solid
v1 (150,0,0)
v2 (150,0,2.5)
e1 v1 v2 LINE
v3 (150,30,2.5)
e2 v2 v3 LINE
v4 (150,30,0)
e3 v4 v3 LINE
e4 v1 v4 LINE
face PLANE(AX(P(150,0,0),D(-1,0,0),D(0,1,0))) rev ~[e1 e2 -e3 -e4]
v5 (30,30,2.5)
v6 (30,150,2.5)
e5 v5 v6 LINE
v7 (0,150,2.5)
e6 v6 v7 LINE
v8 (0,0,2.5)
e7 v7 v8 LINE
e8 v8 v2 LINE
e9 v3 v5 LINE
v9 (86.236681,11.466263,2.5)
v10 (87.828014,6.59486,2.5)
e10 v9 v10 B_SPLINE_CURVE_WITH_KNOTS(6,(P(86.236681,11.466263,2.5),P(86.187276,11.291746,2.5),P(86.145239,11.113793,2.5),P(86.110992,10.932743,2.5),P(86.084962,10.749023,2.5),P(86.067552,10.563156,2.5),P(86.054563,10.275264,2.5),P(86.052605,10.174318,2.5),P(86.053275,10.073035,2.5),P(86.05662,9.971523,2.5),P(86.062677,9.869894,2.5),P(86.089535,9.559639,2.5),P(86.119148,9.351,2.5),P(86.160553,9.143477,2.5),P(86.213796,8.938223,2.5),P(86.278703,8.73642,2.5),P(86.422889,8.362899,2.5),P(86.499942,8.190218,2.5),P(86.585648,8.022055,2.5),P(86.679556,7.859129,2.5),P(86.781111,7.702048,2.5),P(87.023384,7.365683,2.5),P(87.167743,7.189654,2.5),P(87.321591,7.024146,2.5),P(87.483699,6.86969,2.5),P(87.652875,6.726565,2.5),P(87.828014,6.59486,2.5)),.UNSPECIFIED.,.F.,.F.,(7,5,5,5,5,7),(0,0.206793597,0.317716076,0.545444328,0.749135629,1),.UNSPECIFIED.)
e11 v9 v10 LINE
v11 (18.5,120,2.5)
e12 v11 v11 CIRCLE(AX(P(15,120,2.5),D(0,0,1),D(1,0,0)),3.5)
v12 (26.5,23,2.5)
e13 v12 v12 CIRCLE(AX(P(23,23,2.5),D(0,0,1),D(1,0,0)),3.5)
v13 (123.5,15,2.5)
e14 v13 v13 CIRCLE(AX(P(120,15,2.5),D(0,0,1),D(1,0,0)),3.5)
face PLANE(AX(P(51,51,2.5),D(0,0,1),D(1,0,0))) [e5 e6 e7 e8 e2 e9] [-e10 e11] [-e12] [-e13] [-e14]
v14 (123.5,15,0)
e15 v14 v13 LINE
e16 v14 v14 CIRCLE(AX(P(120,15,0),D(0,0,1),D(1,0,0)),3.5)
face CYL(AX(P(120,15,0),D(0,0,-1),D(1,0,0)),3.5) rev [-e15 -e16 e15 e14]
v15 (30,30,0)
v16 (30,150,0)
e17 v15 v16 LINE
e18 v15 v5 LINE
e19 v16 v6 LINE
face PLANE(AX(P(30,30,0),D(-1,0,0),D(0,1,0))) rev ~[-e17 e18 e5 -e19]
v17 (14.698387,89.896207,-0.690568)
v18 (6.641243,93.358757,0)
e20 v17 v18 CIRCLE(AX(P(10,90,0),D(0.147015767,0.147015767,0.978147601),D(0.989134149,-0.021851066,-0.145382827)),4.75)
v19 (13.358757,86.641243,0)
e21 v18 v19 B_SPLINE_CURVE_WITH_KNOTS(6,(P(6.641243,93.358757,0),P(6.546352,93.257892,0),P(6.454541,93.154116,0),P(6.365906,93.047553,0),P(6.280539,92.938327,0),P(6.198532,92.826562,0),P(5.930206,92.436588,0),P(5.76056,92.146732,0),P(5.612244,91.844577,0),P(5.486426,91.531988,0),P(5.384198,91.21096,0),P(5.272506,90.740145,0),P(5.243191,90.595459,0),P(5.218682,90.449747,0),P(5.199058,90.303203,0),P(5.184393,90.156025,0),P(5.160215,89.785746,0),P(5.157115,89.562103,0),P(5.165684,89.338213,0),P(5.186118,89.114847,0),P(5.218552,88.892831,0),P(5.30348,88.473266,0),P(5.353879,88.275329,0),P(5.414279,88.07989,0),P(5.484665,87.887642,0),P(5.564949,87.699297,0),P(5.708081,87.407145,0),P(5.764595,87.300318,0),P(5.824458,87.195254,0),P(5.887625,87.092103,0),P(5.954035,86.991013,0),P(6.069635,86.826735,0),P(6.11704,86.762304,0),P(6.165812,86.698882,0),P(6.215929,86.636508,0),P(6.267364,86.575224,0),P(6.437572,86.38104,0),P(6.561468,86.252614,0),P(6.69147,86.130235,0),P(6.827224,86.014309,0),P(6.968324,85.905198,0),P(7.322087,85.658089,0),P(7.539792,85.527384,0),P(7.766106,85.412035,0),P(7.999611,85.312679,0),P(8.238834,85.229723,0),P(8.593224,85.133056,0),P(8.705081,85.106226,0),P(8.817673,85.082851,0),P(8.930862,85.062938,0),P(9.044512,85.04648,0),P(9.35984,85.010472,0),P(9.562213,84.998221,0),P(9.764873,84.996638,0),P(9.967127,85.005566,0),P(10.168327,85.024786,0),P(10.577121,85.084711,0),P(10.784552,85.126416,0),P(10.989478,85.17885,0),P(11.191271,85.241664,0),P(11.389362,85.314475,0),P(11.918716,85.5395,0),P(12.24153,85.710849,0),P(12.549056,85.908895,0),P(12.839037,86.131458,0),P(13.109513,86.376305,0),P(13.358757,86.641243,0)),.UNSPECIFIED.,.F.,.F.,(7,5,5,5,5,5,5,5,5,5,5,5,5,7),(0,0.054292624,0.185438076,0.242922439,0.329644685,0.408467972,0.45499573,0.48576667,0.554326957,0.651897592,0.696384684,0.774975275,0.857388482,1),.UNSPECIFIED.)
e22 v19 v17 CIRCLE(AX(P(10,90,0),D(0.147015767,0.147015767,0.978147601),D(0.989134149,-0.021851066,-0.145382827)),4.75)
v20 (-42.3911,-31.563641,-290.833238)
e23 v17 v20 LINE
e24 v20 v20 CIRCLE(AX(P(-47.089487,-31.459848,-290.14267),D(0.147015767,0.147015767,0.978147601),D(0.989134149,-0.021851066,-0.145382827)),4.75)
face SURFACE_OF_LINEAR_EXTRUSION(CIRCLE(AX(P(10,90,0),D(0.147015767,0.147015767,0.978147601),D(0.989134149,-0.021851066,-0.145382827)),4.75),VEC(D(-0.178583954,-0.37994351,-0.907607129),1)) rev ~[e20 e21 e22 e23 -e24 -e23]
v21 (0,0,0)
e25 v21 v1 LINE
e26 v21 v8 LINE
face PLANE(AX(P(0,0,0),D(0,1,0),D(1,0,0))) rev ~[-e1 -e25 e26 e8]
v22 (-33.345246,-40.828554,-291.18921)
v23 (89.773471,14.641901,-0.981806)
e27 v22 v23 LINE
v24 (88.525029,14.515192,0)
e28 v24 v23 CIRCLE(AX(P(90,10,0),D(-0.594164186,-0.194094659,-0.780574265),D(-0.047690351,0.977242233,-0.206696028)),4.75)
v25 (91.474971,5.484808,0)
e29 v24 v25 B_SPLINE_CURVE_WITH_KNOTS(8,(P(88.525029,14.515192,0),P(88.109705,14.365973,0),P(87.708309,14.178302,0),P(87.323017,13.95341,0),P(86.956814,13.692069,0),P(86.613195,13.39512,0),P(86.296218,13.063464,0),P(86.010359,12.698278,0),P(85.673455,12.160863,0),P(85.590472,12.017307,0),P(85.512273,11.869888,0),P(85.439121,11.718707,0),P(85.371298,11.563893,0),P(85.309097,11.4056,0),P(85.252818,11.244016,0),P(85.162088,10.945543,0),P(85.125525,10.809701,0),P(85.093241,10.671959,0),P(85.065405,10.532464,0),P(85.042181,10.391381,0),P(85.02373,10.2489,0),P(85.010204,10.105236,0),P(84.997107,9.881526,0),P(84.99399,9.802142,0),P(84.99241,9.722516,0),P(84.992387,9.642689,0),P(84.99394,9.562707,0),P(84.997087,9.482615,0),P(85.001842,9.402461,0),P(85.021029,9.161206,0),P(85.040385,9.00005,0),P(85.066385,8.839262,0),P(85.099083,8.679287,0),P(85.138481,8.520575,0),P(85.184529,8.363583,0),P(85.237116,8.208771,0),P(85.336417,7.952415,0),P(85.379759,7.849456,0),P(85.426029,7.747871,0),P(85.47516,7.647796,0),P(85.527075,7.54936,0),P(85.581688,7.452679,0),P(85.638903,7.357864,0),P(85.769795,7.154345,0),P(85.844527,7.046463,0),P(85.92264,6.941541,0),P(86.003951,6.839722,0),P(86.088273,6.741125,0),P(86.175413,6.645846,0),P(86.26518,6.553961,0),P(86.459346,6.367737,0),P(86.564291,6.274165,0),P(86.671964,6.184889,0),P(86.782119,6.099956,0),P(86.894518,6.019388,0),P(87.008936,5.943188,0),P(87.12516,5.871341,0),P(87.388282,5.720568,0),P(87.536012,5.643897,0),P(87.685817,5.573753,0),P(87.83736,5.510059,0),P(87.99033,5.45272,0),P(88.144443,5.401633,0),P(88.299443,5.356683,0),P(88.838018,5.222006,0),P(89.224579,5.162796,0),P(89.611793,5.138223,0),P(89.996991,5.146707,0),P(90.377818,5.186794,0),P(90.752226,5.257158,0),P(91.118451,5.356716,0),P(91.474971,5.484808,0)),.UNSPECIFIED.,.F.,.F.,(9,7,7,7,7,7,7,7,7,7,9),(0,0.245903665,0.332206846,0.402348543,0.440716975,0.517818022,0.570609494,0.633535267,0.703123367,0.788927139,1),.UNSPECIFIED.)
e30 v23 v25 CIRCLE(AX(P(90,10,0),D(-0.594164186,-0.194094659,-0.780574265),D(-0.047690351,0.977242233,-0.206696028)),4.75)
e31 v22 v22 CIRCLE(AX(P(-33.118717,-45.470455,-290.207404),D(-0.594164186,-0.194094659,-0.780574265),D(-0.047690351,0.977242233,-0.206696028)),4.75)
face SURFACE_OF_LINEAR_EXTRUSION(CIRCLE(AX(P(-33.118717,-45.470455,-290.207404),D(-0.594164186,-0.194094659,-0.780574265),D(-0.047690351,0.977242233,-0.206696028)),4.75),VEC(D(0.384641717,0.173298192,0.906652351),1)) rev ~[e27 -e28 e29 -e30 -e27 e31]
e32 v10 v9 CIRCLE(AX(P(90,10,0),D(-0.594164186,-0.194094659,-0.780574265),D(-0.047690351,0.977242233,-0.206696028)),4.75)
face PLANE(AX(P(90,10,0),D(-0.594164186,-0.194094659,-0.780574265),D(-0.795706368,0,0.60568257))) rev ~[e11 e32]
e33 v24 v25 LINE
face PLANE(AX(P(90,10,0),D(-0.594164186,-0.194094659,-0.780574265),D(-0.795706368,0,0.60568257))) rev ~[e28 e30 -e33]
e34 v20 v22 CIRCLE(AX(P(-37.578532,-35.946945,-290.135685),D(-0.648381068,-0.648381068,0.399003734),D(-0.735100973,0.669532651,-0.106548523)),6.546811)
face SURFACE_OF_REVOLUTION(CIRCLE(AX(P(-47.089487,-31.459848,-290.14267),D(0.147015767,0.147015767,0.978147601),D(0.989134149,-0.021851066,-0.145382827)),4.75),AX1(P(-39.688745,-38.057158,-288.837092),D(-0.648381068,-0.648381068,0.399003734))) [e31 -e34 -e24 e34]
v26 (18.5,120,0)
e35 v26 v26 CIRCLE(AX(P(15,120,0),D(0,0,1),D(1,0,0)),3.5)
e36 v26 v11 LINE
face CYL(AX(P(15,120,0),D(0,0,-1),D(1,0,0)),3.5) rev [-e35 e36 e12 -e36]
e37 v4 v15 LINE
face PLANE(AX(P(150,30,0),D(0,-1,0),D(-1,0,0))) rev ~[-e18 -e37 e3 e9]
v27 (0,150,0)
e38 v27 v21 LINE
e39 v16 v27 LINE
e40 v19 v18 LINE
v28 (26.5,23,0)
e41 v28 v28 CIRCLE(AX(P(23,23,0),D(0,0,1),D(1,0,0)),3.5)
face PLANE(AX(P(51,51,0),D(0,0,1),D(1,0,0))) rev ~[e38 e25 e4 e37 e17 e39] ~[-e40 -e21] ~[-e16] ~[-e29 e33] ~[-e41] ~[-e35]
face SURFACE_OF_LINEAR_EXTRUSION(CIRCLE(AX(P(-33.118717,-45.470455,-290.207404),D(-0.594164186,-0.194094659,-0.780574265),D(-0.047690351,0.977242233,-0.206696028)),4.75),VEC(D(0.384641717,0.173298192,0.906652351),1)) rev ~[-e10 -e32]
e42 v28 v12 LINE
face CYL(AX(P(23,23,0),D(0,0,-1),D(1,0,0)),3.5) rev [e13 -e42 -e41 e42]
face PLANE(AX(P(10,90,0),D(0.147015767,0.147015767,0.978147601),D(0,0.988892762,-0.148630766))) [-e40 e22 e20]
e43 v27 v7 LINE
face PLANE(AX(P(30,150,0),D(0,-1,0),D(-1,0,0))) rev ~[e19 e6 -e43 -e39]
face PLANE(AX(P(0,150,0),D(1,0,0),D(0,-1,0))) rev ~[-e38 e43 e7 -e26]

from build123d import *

# Parameters (mm, degrees)
F0_R     = 4.75
F0_R_2   = 3.5
F1_DEPTH = 2.5
F9_R     = 4.75


with BuildPart() as f1:
    # F0 (on Top) → F1 (new body)
    with BuildSketch(Plane.XY):
        Polygon((0, 150), (0, 0), (150, 0), (150, 10), (150, 30), (30, 30), (30, 150), (10, 150), align=None)
        with Locations((10, 10)):
            Circle(F0_R, mode=Mode.SUBTRACT)
        with Locations((23, 23)):
            Circle(F0_R_2, mode=Mode.SUBTRACT)
        with Locations((90, 10)):
            Circle(F0_R, mode=Mode.SUBTRACT)
        with Locations((120, 15)):
            Circle(F0_R_2, mode=Mode.SUBTRACT)
        with Locations((10, 90)):
            Circle(F0_R, mode=Mode.SUBTRACT)
        with Locations((15, 120)):
            Circle(F0_R_2, mode=Mode.SUBTRACT)
        with Locations((10, 10)):
            Circle(F0_R)
        with Locations((90, 10)):
            Circle(F0_R)
        with Locations((10, 90)):
            Circle(F0_R)
    extrude(amount=F1_DEPTH)

    # F10: sweep along a path in F7
    with BuildLine(Plane(origin=(42.039800995, 42.039800995, -25.8706467662), x_dir=(0.5521991294, -0.7613159594, -0.3398148488), z_dir=(-0.6483810685, -0.6483810685, 0.3990037344))) as f10_path:
        Line((-62.9964450532, 5.2409742566), (96.5428984083, -271.7818964901))
        ThreePointArc((96.5428984083, -271.7818964901), (108.8813288368, -276.0923992559), (114.9460414041, -264.5149832658))
        Line((114.9460414041, -264.5149832658), (42.084762048, 47.1687683098))
    # F9 (on face) → F10 (sweep)
    with BuildSketch(Plane(origin=(2.1613635589, 2.1613635589, 14.3803119238), x_dir=(0.9891341488, -0.021851066, -0.1453828274), z_dir=(0.1470157665, 0.1470157665, 0.9781476007))):
        with Locations((7.9247455466, 89.0003486068)):
            Circle(F9_R)
    sweep(path=f10_path.line)


solid = f1.part
